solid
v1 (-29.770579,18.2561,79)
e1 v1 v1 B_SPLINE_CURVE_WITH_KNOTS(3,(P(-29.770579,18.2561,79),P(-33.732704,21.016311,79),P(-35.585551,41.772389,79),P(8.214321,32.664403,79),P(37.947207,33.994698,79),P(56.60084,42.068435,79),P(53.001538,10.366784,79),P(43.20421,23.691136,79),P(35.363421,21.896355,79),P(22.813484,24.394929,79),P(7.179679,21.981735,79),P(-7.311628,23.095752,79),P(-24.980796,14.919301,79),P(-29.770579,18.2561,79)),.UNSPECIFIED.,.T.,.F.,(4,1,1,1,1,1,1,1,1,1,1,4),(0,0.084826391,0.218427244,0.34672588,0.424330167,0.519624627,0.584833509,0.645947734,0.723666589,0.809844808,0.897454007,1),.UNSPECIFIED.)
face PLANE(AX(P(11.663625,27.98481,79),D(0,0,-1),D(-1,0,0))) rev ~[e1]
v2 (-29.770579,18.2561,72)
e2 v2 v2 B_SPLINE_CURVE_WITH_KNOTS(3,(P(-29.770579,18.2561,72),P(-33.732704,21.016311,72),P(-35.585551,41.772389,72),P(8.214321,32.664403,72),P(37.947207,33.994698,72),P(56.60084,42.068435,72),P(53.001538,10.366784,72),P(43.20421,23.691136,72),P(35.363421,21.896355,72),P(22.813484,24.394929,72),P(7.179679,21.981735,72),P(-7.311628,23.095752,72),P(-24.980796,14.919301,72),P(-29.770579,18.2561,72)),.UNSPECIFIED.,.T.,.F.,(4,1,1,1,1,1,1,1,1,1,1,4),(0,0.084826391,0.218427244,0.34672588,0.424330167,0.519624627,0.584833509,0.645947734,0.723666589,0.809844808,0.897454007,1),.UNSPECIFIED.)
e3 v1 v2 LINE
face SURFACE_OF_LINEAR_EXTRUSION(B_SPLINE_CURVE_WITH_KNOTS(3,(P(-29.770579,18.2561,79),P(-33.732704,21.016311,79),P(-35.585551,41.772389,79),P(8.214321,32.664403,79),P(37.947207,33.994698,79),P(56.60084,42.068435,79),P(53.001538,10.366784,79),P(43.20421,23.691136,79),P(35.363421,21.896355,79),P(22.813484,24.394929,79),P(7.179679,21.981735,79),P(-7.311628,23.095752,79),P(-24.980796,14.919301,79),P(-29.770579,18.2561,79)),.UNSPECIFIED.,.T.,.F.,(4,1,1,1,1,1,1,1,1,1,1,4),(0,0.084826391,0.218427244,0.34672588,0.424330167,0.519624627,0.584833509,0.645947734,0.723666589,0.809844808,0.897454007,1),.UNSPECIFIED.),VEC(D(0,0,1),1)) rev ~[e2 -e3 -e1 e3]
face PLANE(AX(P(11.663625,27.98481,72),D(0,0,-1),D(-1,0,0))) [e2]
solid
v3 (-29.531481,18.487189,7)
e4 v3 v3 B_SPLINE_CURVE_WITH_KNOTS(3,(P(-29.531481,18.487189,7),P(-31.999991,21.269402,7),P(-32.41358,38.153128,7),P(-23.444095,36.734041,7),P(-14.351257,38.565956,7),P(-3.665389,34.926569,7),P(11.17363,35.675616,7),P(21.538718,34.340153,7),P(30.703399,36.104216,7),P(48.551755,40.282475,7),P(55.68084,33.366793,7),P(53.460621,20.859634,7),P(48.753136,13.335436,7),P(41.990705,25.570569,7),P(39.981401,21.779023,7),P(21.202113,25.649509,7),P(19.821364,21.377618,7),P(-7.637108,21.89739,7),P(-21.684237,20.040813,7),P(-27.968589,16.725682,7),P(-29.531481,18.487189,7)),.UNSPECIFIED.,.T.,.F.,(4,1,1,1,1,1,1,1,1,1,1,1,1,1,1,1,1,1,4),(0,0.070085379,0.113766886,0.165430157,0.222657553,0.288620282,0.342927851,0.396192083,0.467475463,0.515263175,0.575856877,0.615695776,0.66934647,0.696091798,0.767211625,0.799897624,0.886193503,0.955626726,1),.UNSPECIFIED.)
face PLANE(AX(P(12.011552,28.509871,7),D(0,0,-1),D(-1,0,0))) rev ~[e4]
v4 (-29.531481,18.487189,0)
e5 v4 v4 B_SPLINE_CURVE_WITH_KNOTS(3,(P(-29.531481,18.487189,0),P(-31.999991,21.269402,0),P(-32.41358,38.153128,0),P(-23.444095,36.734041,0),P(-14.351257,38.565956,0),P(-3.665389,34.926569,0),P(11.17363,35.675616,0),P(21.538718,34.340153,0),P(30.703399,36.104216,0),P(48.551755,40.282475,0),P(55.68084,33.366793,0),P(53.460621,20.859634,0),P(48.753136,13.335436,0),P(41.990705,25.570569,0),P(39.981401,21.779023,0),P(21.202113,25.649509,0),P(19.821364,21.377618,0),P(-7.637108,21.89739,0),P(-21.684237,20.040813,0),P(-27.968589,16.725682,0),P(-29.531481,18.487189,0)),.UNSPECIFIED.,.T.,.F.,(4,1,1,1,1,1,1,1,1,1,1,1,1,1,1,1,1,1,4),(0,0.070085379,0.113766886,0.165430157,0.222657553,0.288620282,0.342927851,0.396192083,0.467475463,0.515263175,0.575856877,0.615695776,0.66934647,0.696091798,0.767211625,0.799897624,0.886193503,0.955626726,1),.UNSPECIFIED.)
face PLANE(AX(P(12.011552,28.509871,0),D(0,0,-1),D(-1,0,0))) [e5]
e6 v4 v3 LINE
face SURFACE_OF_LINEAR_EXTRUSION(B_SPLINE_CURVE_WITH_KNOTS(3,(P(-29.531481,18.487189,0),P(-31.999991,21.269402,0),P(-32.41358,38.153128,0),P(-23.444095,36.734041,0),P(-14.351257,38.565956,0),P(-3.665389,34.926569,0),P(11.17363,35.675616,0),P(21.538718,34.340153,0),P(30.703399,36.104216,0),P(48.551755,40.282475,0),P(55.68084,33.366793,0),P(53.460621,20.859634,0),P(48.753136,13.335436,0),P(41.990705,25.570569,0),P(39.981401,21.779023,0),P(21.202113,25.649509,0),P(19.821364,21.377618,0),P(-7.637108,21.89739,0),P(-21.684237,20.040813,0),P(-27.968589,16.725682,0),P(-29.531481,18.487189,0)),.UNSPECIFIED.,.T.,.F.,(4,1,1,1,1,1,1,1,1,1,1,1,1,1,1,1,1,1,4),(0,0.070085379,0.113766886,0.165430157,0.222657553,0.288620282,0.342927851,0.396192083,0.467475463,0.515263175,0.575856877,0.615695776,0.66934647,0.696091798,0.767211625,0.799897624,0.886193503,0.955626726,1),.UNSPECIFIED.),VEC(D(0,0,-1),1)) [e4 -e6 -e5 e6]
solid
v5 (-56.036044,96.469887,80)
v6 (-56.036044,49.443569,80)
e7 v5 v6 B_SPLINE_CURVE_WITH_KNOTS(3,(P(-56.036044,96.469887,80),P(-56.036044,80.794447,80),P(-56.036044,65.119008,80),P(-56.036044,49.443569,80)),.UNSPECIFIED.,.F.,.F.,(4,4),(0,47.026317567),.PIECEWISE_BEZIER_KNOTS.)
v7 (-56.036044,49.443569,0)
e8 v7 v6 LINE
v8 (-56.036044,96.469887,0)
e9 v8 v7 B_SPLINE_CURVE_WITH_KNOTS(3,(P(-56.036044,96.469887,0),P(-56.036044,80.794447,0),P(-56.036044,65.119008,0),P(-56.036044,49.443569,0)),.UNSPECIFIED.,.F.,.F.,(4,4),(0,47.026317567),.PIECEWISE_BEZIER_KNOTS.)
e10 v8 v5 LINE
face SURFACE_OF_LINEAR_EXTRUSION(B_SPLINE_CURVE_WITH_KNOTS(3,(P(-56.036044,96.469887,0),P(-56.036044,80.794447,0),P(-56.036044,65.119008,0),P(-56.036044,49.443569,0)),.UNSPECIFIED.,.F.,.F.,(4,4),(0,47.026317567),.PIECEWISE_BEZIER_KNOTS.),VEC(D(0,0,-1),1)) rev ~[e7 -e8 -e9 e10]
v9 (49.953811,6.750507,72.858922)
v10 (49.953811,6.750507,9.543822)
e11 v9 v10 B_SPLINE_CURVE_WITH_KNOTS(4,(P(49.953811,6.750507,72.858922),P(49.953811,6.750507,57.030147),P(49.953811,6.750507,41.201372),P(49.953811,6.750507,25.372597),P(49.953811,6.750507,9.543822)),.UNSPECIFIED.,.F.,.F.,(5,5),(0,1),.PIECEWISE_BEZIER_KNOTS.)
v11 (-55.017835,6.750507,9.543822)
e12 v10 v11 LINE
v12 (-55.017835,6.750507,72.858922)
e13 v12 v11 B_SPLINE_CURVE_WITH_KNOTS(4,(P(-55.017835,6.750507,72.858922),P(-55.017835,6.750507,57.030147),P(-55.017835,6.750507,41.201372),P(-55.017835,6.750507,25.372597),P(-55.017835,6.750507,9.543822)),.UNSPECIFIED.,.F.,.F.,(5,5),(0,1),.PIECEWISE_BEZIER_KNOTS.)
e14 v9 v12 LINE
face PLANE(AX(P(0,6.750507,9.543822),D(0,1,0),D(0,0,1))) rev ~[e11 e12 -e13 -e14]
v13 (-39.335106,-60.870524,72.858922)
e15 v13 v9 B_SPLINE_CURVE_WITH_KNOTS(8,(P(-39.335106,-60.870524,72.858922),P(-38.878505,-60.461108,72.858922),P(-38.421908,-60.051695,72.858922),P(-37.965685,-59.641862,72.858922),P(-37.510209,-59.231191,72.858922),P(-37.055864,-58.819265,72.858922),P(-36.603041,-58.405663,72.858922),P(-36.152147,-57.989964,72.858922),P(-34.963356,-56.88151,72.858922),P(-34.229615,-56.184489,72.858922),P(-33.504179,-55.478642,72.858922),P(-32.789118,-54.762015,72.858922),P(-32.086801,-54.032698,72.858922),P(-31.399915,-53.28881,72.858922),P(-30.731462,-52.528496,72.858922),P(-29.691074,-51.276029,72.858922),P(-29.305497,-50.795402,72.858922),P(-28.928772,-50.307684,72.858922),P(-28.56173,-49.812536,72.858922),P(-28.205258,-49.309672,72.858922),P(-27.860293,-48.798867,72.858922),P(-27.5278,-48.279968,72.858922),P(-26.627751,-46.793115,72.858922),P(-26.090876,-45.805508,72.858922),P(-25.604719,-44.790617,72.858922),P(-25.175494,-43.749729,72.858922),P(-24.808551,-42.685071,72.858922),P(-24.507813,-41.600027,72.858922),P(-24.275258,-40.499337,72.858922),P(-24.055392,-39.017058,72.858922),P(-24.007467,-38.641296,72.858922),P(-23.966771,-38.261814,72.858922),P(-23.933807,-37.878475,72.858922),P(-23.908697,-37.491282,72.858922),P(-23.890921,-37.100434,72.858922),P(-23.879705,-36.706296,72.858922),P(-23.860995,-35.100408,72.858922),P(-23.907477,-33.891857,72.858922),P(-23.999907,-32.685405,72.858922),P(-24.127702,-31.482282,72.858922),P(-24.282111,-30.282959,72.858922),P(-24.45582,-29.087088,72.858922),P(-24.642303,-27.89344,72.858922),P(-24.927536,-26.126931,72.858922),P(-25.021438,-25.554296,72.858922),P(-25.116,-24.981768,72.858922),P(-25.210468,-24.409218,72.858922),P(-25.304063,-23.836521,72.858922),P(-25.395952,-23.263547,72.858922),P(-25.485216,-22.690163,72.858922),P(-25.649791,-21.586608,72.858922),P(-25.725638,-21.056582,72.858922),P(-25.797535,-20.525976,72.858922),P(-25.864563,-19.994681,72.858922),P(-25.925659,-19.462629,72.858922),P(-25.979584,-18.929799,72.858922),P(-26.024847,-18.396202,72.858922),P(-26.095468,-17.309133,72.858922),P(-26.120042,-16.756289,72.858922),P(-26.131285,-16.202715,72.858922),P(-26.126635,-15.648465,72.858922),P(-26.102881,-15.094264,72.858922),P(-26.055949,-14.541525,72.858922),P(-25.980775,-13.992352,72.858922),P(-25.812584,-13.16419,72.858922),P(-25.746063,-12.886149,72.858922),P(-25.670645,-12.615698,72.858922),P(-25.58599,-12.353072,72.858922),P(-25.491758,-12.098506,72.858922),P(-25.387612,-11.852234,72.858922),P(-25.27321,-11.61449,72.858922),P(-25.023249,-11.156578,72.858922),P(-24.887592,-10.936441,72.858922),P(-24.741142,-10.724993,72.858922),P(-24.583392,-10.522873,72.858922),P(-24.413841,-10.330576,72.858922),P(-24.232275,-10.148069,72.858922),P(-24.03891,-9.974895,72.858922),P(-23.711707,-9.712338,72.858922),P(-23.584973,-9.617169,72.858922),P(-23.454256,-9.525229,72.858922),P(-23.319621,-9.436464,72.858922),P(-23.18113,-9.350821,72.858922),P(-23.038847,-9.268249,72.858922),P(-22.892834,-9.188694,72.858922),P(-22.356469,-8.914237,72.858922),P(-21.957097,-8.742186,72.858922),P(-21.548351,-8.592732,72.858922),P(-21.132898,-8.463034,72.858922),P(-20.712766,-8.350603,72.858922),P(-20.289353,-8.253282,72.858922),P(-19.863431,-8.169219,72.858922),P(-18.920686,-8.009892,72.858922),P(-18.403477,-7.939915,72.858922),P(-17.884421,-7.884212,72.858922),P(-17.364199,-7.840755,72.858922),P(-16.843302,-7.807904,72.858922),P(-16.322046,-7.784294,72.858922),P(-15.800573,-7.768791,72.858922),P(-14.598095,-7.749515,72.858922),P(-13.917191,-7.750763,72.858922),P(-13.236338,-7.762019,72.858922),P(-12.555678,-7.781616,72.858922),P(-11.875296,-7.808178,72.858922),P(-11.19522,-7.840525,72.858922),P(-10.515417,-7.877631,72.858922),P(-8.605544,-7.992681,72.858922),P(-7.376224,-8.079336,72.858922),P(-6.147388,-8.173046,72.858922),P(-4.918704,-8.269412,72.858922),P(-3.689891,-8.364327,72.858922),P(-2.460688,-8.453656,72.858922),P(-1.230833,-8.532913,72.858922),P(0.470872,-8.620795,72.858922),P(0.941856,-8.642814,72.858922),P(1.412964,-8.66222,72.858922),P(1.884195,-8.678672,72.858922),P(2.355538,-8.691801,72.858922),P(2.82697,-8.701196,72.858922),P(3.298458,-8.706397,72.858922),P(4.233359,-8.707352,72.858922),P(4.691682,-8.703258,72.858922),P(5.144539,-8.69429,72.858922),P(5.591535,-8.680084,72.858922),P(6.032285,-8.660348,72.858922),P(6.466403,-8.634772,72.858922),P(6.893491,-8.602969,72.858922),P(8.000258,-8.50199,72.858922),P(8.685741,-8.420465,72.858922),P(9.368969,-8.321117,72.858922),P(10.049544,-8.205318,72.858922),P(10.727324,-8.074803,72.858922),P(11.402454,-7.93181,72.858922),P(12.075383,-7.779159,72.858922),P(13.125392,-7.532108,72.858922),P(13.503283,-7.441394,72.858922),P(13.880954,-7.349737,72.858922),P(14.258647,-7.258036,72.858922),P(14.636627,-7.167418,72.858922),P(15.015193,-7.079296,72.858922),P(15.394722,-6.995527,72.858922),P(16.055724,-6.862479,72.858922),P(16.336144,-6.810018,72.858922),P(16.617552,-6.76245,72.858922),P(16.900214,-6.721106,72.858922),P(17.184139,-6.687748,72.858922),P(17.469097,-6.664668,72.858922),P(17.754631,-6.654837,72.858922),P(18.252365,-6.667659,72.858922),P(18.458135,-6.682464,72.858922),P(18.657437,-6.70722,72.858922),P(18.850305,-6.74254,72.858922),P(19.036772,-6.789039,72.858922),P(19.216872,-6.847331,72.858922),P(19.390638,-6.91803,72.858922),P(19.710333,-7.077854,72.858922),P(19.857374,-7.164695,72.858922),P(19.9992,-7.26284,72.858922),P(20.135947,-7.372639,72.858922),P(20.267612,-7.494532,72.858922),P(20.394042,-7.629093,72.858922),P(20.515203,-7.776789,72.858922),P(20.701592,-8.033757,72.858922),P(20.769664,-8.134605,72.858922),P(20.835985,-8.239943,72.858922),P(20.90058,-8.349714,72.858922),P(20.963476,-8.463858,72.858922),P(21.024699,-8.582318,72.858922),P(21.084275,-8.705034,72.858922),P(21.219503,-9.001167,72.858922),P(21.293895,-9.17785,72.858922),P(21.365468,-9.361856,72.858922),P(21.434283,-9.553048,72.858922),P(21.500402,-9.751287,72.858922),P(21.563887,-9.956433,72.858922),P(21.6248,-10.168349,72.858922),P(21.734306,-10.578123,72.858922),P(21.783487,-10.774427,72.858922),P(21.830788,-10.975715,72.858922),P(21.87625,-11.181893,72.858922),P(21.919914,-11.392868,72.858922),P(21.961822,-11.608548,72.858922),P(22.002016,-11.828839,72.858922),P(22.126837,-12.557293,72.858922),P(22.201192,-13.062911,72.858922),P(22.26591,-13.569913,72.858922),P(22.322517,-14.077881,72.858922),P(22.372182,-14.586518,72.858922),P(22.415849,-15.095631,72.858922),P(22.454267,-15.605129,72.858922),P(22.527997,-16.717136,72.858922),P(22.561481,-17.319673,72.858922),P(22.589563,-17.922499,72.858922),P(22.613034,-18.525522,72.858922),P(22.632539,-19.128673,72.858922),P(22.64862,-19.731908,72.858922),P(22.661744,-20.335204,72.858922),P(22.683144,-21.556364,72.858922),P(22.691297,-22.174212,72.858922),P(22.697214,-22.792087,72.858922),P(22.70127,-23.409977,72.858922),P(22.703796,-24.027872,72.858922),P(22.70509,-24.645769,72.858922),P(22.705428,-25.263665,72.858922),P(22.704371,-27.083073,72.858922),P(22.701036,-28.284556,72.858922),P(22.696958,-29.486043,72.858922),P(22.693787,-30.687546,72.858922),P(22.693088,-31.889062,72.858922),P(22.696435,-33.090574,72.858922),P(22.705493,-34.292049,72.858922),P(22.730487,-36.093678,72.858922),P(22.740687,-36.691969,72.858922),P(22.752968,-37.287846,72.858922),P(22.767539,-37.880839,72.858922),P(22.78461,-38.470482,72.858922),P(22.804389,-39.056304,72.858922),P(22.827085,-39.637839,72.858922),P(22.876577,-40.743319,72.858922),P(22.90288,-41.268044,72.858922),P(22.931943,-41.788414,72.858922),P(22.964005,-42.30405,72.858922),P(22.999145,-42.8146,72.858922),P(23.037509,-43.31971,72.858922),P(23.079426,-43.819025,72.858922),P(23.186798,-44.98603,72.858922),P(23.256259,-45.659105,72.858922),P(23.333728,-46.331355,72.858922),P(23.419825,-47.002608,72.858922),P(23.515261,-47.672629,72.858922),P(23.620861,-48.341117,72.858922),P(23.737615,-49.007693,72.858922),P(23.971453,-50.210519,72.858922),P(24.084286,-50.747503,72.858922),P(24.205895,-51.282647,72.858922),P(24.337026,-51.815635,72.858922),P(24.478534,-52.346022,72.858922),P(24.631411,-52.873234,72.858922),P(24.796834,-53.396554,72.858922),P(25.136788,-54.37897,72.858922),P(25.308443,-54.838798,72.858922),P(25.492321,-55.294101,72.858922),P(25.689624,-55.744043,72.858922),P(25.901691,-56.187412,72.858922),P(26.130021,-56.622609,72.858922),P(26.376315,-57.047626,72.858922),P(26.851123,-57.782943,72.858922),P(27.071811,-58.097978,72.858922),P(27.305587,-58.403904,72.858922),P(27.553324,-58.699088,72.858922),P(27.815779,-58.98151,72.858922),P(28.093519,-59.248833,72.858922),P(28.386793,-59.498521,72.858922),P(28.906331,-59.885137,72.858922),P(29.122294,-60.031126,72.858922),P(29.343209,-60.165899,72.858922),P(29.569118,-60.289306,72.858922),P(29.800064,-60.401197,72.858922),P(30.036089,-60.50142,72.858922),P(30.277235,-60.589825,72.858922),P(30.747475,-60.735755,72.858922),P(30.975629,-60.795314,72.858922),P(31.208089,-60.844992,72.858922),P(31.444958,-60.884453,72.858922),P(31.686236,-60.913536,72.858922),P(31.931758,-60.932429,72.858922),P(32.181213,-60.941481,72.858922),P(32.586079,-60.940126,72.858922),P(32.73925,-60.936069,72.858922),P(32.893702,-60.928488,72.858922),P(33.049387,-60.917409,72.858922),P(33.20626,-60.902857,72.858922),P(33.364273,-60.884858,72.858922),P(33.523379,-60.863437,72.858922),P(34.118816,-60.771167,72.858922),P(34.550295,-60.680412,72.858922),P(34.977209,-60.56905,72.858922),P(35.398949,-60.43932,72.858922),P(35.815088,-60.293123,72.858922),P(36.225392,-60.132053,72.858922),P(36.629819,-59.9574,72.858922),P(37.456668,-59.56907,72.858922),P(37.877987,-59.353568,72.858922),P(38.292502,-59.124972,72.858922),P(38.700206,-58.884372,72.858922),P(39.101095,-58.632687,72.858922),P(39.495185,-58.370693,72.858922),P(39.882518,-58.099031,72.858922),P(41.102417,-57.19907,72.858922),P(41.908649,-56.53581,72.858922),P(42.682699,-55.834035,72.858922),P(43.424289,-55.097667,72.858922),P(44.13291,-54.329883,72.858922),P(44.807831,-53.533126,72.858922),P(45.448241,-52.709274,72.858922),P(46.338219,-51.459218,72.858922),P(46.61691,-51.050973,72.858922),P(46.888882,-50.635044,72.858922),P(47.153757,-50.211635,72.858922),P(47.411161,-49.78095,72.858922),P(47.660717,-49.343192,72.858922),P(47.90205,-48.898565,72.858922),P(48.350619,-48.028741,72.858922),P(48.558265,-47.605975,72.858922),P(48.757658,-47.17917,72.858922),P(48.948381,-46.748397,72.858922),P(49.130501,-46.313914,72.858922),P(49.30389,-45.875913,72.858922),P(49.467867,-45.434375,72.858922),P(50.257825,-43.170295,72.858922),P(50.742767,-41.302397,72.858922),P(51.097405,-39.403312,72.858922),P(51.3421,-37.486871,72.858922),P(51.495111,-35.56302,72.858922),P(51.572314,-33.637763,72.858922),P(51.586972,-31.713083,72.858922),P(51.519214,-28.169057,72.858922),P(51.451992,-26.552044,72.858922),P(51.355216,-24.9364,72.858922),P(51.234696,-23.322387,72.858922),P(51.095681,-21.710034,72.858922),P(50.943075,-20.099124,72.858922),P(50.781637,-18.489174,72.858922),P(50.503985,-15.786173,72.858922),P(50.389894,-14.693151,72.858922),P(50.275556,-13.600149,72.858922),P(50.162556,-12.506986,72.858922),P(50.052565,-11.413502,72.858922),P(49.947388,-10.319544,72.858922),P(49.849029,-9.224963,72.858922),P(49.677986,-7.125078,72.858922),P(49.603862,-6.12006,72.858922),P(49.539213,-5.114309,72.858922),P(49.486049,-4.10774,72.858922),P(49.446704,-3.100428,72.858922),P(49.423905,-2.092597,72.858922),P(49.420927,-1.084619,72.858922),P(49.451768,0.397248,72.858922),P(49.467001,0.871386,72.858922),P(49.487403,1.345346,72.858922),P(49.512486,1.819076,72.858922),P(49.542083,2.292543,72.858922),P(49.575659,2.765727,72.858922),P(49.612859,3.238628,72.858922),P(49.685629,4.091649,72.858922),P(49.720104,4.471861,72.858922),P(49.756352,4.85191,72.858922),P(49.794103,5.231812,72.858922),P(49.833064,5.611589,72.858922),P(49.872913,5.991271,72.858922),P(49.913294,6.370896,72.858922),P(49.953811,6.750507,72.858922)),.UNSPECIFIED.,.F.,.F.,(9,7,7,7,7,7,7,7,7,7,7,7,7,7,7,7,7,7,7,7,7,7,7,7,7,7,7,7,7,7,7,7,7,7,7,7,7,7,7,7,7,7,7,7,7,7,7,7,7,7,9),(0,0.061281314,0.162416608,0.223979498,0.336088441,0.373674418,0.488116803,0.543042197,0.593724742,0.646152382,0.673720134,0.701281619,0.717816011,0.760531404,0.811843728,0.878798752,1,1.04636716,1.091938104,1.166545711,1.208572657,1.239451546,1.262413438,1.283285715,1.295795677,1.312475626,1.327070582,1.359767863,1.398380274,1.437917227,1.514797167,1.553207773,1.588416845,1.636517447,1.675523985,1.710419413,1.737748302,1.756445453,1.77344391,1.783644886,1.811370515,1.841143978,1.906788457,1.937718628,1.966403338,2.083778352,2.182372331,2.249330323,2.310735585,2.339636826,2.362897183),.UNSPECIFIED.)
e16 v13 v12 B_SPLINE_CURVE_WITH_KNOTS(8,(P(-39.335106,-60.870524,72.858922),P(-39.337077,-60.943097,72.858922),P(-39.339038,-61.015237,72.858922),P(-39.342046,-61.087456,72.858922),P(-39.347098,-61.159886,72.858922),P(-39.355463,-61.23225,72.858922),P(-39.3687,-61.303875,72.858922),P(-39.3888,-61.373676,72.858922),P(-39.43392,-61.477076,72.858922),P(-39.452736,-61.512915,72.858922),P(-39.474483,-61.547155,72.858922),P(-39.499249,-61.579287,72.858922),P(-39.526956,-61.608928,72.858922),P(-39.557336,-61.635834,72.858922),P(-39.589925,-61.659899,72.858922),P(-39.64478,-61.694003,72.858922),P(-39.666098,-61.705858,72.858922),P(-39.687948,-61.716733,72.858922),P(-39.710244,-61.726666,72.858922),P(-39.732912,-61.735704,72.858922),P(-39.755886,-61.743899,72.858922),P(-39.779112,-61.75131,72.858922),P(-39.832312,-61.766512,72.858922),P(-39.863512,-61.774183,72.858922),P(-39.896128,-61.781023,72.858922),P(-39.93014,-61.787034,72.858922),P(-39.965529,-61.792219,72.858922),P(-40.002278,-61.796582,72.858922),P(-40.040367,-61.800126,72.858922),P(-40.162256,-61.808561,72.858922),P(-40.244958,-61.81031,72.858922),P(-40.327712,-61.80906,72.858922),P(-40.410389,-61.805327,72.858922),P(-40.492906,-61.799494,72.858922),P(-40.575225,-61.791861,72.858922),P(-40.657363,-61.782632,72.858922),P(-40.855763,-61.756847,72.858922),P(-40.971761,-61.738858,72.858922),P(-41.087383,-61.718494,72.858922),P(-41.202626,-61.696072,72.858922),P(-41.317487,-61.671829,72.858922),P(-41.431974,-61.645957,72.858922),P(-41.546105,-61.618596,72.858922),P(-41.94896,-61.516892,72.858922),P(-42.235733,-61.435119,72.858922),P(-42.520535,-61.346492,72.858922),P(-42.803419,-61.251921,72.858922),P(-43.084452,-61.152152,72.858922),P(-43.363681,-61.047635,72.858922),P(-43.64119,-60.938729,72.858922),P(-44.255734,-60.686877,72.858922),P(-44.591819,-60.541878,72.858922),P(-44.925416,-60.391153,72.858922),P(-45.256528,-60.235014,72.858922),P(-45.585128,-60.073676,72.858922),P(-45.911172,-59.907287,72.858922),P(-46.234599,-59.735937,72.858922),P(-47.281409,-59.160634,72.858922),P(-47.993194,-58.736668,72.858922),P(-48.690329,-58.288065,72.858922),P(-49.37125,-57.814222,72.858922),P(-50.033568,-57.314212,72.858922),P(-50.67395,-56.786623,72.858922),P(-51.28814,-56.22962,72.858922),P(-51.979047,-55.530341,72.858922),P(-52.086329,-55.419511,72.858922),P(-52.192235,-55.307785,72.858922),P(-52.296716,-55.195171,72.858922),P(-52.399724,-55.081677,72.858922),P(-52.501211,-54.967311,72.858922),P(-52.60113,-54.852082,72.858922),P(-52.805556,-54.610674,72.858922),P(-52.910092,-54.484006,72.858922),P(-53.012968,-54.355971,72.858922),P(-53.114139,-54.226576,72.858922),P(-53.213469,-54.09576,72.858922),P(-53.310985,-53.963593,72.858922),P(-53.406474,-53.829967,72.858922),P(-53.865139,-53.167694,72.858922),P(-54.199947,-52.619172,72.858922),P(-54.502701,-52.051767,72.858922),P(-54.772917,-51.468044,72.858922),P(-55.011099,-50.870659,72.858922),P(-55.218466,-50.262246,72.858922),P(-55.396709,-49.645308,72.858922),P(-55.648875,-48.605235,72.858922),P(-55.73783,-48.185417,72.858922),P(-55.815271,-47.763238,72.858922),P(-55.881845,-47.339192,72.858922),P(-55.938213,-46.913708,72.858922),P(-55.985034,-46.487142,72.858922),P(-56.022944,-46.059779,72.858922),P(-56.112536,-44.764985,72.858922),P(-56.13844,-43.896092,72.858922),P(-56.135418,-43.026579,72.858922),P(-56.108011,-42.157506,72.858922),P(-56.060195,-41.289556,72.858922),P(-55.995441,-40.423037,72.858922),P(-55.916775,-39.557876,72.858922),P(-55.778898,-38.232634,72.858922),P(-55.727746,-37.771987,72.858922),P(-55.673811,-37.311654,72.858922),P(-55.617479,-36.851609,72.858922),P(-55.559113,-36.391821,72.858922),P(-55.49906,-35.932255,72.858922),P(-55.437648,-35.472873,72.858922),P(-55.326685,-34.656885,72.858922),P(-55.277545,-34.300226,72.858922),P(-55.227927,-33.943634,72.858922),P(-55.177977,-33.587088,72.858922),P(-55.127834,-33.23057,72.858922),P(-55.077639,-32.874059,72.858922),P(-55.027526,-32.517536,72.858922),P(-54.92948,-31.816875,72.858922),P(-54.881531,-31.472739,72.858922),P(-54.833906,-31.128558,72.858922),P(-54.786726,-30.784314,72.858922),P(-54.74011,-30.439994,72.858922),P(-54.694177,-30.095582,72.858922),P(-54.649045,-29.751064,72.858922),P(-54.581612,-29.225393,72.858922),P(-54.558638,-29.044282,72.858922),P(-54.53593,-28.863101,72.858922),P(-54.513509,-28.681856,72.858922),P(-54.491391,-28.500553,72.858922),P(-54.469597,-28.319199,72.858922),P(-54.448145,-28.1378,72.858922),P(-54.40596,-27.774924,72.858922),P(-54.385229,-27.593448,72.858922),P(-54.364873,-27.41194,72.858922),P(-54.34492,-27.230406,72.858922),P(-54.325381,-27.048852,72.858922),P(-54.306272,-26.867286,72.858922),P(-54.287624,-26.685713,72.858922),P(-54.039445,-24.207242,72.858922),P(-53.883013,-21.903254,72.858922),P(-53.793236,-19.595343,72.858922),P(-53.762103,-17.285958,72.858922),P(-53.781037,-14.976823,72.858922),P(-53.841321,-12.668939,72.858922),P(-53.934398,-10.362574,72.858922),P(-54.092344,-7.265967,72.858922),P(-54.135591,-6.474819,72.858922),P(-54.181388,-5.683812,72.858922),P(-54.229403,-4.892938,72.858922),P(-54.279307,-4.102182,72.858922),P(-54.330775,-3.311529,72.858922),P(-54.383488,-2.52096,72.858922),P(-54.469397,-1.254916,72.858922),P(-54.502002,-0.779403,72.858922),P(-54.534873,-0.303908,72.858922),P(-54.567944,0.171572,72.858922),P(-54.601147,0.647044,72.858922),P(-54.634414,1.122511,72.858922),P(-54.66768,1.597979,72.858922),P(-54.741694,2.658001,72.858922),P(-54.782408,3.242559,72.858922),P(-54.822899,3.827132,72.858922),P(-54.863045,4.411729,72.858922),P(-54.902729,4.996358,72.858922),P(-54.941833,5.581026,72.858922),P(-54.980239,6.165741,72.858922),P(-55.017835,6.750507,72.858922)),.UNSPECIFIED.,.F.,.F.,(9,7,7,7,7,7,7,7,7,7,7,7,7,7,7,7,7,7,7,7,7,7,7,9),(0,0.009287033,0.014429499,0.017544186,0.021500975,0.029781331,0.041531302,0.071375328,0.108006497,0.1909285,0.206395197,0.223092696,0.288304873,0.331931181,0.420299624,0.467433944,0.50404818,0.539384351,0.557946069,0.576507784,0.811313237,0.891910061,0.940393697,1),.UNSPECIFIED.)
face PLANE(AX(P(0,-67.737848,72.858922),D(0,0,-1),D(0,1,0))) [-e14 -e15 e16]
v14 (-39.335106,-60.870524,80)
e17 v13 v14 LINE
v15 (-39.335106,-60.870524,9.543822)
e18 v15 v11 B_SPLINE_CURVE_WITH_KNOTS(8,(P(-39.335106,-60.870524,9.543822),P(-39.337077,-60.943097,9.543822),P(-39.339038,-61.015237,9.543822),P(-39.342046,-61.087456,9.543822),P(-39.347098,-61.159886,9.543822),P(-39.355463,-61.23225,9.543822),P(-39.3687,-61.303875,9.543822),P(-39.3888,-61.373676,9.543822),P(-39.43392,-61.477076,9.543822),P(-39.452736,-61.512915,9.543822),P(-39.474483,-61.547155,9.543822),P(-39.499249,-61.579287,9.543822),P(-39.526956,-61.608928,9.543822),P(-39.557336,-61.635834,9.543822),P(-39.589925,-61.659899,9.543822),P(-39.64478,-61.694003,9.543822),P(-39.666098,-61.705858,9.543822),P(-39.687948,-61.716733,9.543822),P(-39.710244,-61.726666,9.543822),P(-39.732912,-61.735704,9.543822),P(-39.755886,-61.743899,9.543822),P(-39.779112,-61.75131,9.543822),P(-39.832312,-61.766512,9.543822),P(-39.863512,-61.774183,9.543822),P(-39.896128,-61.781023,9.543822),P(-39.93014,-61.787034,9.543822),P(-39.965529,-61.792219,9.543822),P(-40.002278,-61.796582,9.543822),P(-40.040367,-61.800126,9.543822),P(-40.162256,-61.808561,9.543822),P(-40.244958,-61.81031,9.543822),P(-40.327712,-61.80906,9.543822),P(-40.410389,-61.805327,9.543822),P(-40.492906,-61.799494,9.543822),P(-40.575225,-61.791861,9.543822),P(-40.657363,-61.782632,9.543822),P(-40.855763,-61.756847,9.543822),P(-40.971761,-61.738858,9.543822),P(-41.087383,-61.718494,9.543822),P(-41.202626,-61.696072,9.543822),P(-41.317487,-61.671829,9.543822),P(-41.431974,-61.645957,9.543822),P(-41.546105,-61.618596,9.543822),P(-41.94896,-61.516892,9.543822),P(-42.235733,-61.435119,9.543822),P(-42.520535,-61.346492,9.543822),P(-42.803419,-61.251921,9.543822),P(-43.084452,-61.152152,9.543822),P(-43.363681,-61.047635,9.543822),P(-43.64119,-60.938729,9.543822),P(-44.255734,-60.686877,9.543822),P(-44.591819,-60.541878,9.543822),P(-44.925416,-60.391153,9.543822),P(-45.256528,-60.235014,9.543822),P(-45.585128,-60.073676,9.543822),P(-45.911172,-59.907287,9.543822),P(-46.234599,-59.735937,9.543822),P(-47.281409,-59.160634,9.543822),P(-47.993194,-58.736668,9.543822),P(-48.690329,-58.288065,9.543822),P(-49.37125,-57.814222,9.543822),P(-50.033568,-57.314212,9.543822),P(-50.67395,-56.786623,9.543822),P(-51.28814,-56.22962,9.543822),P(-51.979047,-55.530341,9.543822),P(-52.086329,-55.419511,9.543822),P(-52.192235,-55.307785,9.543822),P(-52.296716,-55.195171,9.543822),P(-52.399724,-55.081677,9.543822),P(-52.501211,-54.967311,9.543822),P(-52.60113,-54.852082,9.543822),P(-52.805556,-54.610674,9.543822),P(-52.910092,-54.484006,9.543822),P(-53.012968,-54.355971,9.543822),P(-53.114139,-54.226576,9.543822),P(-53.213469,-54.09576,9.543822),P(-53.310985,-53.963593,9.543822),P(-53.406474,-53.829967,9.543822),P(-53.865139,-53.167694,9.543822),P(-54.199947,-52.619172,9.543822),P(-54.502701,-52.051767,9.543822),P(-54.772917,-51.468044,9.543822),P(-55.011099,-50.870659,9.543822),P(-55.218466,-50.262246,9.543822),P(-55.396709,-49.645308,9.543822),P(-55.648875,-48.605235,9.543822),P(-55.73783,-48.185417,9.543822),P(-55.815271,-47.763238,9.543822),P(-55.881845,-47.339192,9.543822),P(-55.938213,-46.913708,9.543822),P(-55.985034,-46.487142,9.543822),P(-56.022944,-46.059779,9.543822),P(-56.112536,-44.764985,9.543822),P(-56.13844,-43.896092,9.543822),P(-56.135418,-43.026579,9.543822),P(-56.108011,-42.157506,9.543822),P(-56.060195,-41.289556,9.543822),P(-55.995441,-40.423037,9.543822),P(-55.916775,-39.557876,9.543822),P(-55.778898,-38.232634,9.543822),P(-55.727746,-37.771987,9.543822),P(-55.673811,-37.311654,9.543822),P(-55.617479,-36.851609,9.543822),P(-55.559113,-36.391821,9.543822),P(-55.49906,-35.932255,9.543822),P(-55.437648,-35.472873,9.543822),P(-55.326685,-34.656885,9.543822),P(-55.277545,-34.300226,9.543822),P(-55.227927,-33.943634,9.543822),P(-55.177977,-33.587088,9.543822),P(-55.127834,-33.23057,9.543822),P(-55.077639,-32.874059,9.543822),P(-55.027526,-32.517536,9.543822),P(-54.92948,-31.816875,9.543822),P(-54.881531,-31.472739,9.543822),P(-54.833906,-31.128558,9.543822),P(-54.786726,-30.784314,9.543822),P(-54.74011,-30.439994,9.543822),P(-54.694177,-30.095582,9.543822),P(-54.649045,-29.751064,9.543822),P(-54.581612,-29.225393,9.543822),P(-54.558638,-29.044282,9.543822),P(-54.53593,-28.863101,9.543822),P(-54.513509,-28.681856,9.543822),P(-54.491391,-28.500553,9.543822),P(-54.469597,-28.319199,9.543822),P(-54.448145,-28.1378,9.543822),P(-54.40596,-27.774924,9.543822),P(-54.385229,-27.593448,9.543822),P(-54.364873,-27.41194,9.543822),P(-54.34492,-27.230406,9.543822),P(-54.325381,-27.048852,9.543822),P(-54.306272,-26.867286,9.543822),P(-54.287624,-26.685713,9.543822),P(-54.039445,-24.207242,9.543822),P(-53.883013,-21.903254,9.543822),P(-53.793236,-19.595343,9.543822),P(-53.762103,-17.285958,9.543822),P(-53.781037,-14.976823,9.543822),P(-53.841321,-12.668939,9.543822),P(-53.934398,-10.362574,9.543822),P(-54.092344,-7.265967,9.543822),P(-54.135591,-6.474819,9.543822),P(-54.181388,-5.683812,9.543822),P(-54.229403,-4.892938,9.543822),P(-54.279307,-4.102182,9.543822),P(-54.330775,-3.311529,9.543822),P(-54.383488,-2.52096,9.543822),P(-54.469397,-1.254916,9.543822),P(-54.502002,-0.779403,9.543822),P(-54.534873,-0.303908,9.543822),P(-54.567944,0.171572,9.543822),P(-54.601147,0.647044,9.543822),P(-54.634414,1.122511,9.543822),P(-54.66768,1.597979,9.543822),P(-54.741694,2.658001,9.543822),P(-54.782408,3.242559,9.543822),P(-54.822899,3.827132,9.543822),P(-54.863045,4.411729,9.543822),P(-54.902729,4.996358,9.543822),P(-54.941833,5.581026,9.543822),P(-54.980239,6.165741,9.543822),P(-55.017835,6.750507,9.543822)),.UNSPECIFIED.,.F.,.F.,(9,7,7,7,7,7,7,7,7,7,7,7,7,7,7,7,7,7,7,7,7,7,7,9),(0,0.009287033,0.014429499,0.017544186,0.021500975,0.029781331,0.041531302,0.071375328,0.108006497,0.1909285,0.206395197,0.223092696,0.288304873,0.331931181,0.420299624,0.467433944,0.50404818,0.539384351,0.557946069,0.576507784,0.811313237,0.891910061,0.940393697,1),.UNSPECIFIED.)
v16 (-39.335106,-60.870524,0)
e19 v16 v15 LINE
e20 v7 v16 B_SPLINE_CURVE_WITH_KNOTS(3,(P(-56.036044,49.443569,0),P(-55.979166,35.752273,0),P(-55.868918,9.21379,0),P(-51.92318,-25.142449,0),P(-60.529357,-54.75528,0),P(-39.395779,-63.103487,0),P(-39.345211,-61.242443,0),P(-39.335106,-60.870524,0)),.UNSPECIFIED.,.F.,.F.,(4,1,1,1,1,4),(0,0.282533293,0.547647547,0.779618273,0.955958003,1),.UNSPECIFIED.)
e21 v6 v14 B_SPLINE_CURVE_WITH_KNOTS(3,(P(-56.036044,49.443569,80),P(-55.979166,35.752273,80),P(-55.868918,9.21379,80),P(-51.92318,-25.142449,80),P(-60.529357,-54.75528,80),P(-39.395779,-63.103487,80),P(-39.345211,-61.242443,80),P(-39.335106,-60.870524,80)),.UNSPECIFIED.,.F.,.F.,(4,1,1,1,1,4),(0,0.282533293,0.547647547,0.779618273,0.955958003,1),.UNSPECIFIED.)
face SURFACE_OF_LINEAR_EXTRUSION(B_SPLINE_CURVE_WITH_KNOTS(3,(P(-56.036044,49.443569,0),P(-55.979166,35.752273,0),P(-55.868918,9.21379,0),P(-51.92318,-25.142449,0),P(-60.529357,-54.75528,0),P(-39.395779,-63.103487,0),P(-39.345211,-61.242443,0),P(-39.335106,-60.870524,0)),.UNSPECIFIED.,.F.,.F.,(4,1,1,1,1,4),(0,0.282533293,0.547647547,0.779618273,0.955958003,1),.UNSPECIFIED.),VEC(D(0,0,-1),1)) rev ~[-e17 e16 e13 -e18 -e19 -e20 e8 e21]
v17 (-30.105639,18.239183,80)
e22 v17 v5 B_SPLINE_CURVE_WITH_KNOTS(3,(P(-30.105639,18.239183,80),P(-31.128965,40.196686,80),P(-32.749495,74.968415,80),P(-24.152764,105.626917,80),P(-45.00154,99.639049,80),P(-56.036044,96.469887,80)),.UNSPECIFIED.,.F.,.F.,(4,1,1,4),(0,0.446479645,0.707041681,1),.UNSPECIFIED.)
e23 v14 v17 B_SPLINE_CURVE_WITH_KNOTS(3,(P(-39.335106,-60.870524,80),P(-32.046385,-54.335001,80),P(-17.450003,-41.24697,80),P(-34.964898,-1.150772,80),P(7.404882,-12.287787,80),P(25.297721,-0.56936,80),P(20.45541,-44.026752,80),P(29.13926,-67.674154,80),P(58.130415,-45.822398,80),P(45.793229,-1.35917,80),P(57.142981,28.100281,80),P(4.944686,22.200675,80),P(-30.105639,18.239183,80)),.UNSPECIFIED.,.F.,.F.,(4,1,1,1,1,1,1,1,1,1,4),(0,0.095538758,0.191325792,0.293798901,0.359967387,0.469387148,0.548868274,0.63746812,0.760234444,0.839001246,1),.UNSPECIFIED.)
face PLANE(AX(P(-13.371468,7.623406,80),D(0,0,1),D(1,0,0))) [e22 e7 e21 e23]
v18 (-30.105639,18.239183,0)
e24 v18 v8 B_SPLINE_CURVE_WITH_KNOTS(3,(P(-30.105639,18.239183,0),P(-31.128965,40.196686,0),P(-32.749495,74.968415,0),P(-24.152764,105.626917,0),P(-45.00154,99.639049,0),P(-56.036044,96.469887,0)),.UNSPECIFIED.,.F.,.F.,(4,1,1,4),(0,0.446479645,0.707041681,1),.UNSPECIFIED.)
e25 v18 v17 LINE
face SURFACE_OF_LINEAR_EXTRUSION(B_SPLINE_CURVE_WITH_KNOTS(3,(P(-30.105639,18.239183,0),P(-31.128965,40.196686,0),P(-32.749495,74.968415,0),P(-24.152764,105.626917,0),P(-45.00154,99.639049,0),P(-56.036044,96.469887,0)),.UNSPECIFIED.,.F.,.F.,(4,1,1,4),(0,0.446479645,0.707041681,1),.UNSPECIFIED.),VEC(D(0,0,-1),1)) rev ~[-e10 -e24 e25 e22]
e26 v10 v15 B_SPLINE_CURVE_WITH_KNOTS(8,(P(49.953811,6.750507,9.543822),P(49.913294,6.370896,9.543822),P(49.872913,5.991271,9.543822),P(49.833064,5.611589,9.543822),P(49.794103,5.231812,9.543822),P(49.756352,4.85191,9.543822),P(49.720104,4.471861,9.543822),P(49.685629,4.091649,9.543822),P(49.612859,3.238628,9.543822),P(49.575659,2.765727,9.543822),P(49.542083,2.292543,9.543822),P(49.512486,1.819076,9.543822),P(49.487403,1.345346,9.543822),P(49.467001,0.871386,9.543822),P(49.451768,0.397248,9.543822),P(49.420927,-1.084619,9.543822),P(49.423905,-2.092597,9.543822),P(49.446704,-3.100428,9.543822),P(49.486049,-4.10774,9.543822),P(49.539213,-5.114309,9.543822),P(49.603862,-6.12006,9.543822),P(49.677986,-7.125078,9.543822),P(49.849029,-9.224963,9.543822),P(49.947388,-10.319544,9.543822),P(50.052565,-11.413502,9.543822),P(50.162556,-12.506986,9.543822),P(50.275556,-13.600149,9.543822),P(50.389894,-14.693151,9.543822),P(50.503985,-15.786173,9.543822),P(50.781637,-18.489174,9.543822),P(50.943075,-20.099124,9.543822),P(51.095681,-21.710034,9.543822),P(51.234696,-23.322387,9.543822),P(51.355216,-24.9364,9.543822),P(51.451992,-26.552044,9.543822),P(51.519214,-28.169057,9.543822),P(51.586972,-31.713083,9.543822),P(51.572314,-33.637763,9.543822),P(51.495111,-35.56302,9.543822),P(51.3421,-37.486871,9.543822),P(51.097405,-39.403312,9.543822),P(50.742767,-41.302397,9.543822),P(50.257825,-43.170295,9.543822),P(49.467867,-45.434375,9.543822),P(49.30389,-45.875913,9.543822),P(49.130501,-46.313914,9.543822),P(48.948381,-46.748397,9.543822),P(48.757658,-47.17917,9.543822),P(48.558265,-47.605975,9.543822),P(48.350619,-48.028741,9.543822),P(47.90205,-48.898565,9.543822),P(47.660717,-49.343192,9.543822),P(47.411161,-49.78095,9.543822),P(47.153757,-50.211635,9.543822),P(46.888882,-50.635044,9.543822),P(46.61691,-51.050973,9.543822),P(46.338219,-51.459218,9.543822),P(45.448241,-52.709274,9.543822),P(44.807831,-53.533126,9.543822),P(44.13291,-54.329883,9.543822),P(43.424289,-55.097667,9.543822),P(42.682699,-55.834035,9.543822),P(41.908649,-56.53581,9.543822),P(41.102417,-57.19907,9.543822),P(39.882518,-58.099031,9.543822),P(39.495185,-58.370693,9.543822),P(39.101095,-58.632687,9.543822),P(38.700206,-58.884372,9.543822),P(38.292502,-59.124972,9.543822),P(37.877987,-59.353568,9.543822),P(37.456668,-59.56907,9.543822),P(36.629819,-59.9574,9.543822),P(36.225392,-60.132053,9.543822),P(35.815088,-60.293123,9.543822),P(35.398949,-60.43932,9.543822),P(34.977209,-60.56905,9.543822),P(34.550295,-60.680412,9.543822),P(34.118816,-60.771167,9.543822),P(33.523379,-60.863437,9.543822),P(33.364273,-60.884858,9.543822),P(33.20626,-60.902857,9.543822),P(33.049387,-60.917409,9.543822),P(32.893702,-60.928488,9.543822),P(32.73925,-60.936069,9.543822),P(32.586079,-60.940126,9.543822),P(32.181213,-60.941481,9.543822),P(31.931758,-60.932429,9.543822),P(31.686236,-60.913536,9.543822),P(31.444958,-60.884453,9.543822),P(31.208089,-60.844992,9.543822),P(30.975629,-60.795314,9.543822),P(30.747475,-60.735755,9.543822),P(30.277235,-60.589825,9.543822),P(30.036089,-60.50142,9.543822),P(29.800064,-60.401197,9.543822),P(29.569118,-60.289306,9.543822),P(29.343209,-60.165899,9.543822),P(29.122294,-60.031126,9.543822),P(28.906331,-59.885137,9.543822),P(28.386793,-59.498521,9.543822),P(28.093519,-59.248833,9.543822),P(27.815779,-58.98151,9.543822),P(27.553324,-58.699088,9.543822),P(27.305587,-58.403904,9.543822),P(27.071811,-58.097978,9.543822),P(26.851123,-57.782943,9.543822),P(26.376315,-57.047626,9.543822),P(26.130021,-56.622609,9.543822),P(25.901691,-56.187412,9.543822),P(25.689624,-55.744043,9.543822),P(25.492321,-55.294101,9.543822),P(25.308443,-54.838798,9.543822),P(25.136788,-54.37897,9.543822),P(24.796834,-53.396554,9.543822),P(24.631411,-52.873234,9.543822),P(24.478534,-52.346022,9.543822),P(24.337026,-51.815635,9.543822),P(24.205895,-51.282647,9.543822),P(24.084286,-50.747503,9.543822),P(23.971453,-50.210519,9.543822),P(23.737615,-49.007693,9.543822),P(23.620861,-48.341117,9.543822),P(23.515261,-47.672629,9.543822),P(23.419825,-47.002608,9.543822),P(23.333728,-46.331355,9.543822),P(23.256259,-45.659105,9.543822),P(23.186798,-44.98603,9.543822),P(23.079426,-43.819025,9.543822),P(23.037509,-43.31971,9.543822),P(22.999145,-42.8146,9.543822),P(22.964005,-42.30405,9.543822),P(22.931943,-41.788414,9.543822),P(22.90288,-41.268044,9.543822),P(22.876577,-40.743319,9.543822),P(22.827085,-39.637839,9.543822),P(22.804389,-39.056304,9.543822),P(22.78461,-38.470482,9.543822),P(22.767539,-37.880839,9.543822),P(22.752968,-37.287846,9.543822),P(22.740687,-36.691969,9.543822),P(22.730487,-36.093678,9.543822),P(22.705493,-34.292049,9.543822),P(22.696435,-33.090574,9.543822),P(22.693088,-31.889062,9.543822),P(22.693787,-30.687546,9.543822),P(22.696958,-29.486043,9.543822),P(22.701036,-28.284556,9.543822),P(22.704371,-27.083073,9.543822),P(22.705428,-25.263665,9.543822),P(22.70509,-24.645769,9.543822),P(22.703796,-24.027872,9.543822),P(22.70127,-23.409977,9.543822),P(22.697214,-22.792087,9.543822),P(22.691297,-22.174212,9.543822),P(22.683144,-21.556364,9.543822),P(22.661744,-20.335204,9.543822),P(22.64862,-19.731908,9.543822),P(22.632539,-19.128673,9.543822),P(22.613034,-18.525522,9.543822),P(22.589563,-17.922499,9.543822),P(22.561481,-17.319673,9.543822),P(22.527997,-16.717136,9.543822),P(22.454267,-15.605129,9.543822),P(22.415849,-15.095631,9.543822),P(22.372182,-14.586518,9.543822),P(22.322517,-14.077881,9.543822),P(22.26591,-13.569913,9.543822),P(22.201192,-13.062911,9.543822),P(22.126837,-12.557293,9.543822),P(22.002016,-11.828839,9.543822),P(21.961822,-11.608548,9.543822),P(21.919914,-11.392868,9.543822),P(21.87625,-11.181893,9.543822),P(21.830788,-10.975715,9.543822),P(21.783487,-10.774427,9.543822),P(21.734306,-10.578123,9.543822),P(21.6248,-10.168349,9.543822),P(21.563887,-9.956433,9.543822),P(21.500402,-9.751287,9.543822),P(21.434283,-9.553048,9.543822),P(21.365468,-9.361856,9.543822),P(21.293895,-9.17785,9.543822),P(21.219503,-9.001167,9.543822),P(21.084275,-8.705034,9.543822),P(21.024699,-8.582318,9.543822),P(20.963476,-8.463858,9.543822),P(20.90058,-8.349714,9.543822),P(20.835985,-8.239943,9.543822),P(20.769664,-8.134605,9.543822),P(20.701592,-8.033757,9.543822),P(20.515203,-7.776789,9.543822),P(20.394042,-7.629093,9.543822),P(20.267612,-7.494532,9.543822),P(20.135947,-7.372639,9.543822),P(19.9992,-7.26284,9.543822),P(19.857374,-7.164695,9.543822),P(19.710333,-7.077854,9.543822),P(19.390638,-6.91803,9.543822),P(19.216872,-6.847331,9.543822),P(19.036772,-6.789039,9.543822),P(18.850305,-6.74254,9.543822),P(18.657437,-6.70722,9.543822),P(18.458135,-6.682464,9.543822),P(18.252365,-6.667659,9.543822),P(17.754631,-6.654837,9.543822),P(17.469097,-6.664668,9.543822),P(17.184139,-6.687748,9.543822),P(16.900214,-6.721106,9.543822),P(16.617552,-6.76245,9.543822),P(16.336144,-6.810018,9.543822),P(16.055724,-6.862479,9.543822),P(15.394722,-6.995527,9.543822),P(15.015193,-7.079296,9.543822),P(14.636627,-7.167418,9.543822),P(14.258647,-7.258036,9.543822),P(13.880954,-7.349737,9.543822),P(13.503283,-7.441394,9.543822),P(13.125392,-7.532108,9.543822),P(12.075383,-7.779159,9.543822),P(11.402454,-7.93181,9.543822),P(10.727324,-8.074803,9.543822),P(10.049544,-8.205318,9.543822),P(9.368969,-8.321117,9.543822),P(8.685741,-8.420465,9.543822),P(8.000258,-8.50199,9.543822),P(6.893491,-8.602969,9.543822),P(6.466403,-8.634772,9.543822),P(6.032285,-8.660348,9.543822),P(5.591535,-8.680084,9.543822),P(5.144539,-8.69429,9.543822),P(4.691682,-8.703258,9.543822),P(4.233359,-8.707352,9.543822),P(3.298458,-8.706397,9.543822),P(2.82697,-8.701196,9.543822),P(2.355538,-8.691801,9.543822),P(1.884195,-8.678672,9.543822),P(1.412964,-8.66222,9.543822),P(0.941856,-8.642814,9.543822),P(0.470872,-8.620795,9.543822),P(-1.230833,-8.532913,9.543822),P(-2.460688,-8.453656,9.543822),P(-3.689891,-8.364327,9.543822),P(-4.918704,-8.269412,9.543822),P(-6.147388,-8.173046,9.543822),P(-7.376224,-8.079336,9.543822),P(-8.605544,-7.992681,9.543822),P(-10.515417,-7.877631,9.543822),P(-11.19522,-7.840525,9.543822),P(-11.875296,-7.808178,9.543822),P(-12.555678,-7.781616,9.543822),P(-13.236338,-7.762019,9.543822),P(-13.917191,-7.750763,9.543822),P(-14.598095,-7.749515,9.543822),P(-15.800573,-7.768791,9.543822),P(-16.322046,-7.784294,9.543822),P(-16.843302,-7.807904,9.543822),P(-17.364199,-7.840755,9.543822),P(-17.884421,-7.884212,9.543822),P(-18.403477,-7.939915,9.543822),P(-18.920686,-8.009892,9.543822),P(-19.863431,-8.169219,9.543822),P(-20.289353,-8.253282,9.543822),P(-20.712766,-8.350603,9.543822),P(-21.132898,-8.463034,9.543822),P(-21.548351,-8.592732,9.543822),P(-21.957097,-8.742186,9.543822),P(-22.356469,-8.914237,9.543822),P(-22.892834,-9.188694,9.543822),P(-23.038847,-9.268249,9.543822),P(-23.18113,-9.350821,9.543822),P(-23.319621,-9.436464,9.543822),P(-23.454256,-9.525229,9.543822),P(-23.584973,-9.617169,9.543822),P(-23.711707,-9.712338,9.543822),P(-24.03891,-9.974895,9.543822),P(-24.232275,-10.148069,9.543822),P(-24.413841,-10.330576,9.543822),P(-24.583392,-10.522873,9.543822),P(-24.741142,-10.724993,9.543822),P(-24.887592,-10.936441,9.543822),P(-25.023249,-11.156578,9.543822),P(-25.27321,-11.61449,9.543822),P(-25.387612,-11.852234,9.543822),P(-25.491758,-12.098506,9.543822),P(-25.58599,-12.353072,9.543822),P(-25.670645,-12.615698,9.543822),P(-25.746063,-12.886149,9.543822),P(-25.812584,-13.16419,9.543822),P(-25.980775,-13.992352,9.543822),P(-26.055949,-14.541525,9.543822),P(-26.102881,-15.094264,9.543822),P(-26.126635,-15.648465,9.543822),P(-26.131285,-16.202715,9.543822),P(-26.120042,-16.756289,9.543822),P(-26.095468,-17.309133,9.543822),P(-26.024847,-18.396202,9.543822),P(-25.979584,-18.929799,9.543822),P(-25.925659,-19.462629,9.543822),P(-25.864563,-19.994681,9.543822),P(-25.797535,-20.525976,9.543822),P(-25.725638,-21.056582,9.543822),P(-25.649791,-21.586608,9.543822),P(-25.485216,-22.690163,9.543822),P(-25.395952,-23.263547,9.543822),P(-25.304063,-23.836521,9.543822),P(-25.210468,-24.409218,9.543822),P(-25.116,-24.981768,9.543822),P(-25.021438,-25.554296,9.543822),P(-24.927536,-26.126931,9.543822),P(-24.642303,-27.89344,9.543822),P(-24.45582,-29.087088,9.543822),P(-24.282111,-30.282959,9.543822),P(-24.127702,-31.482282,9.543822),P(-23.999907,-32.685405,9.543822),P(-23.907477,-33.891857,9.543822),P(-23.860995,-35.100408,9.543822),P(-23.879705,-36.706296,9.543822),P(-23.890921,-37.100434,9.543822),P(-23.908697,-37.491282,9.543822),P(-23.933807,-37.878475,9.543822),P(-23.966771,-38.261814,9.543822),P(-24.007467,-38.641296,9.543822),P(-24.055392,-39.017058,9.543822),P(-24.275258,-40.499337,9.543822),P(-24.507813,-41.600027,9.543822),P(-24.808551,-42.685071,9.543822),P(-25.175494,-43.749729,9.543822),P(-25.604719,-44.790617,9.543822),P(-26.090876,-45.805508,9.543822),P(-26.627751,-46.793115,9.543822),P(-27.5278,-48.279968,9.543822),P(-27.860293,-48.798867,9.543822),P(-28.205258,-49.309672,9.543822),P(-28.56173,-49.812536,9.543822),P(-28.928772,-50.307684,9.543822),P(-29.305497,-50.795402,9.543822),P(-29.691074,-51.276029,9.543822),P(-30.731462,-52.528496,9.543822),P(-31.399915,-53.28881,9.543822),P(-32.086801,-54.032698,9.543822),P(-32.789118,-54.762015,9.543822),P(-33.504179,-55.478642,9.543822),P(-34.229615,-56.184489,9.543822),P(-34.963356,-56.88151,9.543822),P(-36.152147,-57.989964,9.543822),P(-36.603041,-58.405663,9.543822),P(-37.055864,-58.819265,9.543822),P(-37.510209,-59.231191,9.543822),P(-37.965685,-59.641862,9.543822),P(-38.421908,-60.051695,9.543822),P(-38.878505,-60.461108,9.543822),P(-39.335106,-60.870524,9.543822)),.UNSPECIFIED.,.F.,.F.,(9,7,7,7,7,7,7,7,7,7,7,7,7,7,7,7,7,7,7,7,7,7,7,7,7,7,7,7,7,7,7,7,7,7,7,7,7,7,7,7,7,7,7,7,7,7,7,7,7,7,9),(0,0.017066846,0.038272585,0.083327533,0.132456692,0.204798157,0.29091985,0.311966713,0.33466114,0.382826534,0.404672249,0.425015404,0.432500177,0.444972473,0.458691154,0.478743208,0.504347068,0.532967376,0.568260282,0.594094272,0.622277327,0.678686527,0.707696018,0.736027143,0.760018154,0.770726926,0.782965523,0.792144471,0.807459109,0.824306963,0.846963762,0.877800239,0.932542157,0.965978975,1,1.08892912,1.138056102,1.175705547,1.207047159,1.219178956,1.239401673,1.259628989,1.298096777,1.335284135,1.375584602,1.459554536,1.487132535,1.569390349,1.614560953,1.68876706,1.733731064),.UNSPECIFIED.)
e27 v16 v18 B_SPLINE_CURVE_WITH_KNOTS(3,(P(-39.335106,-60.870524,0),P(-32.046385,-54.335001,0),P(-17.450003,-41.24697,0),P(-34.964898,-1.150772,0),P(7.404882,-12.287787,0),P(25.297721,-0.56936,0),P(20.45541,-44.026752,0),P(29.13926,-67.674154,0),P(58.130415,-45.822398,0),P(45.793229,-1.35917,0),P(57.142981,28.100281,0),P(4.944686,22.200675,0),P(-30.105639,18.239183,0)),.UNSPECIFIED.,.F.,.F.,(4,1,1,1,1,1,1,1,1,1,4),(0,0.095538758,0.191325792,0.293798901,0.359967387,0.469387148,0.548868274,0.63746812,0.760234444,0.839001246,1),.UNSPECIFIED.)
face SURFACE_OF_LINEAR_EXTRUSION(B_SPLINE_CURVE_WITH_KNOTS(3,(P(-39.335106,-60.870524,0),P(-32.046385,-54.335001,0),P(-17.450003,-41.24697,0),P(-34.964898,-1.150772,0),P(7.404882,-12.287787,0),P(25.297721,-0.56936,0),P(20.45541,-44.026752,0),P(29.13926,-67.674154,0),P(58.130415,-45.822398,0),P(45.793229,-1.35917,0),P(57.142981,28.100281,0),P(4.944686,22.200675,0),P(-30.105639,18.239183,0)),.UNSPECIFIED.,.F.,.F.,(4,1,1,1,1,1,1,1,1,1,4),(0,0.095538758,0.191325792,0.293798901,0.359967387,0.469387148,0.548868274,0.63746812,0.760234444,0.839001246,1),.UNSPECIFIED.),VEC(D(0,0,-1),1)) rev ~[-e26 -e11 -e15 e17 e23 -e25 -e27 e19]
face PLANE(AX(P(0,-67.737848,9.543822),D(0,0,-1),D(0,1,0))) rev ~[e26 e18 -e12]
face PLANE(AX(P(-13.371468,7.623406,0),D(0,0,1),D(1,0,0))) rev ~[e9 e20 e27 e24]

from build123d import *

# Parameters (mm, degrees)
F1_DEPTH      = 80
F2_W          = 74.4883548468
F2_H          = 63.3151000366
F3_DEPTH      = 51.565582156
F3_DEPTH_BACK = 60
F6_DEPTH      = 7
F8_DEPTH      = 7


# Not quite as in the source:
# - a feature of the source that left no trace in its solid (it failed there, or was rolled back) is left out


with BuildPart() as f1:
    # F0 (on Top) → F1 (new body)
    with BuildSketch(Plane.XY):
        with BuildLine():
            add(Edge.make_bspline(
                [(-56.0360439122, 96.469886601), (-56.0360439122, 80.7944474121), (-56.0360439122, 65.1190082232), (-56.0360439122, 49.4435690343)],
                knots=[0, 0, 0, 0, 47.0263175666, 47.0263175666, 47.0263175666, 47.0263175666], degree=3))
            add(Edge.make_bspline(
                [(-56.0360439122, 49.4435690343), (-55.97916634, 35.752272772), (-55.8689178713, 9.2137904003), (-51.9231798075, -25.1424485049), (-60.5293571401, -54.7552799982), (-39.395778527, -63.1034869385), (-39.3452111602, -61.2424431878), (-39.3351055682, -60.8705244958)],
                knots=[0, 0, 0, 0, 0.282533293, 0.5476475473, 0.7796182728, 0.9559580028, 1, 1, 1, 1], degree=3))
            add(Edge.make_bspline(
                [(-39.3351055682, -60.8705244958), (-32.0463849559, -54.3350008389), (-17.4500026501, -41.2469697645), (-34.9648975687, -1.1507715076), (7.4048818648, -12.2877867725), (25.2977205252, -0.5693604358), (20.4554095746, -44.0267518029), (29.1392602503, -67.6741537544), (58.1304151815, -45.8223982246), (45.793229252, -1.3591703757), (57.142981437, 28.1002805174), (4.9446855209, 22.2006747256), (-30.1056392491, 18.2391833514)],
                knots=[0, 0, 0, 0, 0.0955387583, 0.1913257916, 0.2937989011, 0.3599673873, 0.4693871483, 0.5488682741, 0.6374681202, 0.7602344438, 0.8390012458, 1, 1, 1, 1], degree=3))
            add(Edge.make_bspline(
                [(-30.1056392491, 18.2391833514), (-31.1289647813, 40.196685604), (-32.7494951047, 74.9684147438), (-24.1527640362, 105.6269168389), (-45.001540177, 99.6390487686), (-56.0360439122, 96.469886601)],
                knots=[0, 0, 0, 0, 0.4464796453, 0.7070416805, 1, 1, 1, 1], degree=3))
        make_face()
    extrude(amount=F1_DEPTH)

    # F2 (on Right) → F3 (cut, two sides)
    with BuildSketch(Plane.YZ) as f3_sk:
        with Locations((-30.4936701432, 41.2013721652)):
            Rectangle(F2_W, F2_H)
    extrude(amount=F3_DEPTH, mode=Mode.SUBTRACT)
    extrude(f3_sk.sketch, amount=-F3_DEPTH_BACK, mode=Mode.SUBTRACT)


with BuildPart() as f6:
    # F5 (on offset) → F6 (new body)
    with BuildSketch(Plane.XY.offset(79)):
        with BuildLine():
            add(Edge.make_bspline(
                [(-29.7705791891, 18.2560998946), (-33.7327043506, 21.0163114633), (-35.5855507611, 41.7723890529), (8.2143213295, 32.6644025717), (37.9472074704, 33.9946980783), (56.6008398148, 42.0684349474), (53.0015381449, 10.3667837393), (43.2042096436, 23.6911360184), (35.3634214473, 21.8963547001), (22.8134837175, 24.3949285391), (7.1796785413, 21.98173495), (-7.3116275375, 23.0957516435), (-24.9807955753, 14.9193006762), (-29.7705791891, 18.2560998946)],
                knots=[0, 0, 0, 0, 0.084826391, 0.2184272441, 0.3467258803, 0.424330167, 0.5196246269, 0.584833509, 0.6459477341, 0.7236665891, 0.8098448079, 0.8974540073, 1, 1, 1, 1], degree=3))
        make_face()
    extrude(amount=-F6_DEPTH)


with BuildPart() as f8:
    # F7 (on Top) → F8 (new body)
    with BuildSketch(Plane.XY):
        with BuildLine():
            add(Edge.make_bspline(
                [(-29.5314807445, 18.4871889651), (-31.9999912099, 21.2694017994), (-32.4135799943, 38.1531278125), (-23.4440949028, 36.7340414586), (-14.3512568848, 38.5659564346), (-3.6653891037, 34.9265690684), (11.1736303336, 35.6756158748), (21.5387176196, 34.3401530989), (30.7033989329, 36.1042157072), (48.551755128, 40.2824748904), (55.6808399445, 33.366793018), (53.460620713, 20.8596340482), (48.7531355051, 13.3354363986), (41.9907047587, 25.5705691098), (39.9814009229, 21.7790231157), (21.2021126611, 25.6495086732), (19.8213643562, 21.3776182112), (-7.6371083647, 21.8973901153), (-21.6842373728, 20.0408127382), (-27.9685885527, 16.7256818637), (-29.5314807445, 18.4871889651)],
                knots=[0, 0, 0, 0, 0.0700853793, 0.1137668862, 0.1654301574, 0.2226575529, 0.2886202815, 0.3429278512, 0.3961920828, 0.4674754634, 0.5152631752, 0.5758568773, 0.6156957759, 0.6693464703, 0.6960917981, 0.7672116252, 0.7998976243, 0.886193503, 0.9556267257, 1, 1, 1, 1], degree=3))
        make_face()
    extrude(amount=F8_DEPTH)


solid = Compound([f1.part, f6.part, f8.part])
